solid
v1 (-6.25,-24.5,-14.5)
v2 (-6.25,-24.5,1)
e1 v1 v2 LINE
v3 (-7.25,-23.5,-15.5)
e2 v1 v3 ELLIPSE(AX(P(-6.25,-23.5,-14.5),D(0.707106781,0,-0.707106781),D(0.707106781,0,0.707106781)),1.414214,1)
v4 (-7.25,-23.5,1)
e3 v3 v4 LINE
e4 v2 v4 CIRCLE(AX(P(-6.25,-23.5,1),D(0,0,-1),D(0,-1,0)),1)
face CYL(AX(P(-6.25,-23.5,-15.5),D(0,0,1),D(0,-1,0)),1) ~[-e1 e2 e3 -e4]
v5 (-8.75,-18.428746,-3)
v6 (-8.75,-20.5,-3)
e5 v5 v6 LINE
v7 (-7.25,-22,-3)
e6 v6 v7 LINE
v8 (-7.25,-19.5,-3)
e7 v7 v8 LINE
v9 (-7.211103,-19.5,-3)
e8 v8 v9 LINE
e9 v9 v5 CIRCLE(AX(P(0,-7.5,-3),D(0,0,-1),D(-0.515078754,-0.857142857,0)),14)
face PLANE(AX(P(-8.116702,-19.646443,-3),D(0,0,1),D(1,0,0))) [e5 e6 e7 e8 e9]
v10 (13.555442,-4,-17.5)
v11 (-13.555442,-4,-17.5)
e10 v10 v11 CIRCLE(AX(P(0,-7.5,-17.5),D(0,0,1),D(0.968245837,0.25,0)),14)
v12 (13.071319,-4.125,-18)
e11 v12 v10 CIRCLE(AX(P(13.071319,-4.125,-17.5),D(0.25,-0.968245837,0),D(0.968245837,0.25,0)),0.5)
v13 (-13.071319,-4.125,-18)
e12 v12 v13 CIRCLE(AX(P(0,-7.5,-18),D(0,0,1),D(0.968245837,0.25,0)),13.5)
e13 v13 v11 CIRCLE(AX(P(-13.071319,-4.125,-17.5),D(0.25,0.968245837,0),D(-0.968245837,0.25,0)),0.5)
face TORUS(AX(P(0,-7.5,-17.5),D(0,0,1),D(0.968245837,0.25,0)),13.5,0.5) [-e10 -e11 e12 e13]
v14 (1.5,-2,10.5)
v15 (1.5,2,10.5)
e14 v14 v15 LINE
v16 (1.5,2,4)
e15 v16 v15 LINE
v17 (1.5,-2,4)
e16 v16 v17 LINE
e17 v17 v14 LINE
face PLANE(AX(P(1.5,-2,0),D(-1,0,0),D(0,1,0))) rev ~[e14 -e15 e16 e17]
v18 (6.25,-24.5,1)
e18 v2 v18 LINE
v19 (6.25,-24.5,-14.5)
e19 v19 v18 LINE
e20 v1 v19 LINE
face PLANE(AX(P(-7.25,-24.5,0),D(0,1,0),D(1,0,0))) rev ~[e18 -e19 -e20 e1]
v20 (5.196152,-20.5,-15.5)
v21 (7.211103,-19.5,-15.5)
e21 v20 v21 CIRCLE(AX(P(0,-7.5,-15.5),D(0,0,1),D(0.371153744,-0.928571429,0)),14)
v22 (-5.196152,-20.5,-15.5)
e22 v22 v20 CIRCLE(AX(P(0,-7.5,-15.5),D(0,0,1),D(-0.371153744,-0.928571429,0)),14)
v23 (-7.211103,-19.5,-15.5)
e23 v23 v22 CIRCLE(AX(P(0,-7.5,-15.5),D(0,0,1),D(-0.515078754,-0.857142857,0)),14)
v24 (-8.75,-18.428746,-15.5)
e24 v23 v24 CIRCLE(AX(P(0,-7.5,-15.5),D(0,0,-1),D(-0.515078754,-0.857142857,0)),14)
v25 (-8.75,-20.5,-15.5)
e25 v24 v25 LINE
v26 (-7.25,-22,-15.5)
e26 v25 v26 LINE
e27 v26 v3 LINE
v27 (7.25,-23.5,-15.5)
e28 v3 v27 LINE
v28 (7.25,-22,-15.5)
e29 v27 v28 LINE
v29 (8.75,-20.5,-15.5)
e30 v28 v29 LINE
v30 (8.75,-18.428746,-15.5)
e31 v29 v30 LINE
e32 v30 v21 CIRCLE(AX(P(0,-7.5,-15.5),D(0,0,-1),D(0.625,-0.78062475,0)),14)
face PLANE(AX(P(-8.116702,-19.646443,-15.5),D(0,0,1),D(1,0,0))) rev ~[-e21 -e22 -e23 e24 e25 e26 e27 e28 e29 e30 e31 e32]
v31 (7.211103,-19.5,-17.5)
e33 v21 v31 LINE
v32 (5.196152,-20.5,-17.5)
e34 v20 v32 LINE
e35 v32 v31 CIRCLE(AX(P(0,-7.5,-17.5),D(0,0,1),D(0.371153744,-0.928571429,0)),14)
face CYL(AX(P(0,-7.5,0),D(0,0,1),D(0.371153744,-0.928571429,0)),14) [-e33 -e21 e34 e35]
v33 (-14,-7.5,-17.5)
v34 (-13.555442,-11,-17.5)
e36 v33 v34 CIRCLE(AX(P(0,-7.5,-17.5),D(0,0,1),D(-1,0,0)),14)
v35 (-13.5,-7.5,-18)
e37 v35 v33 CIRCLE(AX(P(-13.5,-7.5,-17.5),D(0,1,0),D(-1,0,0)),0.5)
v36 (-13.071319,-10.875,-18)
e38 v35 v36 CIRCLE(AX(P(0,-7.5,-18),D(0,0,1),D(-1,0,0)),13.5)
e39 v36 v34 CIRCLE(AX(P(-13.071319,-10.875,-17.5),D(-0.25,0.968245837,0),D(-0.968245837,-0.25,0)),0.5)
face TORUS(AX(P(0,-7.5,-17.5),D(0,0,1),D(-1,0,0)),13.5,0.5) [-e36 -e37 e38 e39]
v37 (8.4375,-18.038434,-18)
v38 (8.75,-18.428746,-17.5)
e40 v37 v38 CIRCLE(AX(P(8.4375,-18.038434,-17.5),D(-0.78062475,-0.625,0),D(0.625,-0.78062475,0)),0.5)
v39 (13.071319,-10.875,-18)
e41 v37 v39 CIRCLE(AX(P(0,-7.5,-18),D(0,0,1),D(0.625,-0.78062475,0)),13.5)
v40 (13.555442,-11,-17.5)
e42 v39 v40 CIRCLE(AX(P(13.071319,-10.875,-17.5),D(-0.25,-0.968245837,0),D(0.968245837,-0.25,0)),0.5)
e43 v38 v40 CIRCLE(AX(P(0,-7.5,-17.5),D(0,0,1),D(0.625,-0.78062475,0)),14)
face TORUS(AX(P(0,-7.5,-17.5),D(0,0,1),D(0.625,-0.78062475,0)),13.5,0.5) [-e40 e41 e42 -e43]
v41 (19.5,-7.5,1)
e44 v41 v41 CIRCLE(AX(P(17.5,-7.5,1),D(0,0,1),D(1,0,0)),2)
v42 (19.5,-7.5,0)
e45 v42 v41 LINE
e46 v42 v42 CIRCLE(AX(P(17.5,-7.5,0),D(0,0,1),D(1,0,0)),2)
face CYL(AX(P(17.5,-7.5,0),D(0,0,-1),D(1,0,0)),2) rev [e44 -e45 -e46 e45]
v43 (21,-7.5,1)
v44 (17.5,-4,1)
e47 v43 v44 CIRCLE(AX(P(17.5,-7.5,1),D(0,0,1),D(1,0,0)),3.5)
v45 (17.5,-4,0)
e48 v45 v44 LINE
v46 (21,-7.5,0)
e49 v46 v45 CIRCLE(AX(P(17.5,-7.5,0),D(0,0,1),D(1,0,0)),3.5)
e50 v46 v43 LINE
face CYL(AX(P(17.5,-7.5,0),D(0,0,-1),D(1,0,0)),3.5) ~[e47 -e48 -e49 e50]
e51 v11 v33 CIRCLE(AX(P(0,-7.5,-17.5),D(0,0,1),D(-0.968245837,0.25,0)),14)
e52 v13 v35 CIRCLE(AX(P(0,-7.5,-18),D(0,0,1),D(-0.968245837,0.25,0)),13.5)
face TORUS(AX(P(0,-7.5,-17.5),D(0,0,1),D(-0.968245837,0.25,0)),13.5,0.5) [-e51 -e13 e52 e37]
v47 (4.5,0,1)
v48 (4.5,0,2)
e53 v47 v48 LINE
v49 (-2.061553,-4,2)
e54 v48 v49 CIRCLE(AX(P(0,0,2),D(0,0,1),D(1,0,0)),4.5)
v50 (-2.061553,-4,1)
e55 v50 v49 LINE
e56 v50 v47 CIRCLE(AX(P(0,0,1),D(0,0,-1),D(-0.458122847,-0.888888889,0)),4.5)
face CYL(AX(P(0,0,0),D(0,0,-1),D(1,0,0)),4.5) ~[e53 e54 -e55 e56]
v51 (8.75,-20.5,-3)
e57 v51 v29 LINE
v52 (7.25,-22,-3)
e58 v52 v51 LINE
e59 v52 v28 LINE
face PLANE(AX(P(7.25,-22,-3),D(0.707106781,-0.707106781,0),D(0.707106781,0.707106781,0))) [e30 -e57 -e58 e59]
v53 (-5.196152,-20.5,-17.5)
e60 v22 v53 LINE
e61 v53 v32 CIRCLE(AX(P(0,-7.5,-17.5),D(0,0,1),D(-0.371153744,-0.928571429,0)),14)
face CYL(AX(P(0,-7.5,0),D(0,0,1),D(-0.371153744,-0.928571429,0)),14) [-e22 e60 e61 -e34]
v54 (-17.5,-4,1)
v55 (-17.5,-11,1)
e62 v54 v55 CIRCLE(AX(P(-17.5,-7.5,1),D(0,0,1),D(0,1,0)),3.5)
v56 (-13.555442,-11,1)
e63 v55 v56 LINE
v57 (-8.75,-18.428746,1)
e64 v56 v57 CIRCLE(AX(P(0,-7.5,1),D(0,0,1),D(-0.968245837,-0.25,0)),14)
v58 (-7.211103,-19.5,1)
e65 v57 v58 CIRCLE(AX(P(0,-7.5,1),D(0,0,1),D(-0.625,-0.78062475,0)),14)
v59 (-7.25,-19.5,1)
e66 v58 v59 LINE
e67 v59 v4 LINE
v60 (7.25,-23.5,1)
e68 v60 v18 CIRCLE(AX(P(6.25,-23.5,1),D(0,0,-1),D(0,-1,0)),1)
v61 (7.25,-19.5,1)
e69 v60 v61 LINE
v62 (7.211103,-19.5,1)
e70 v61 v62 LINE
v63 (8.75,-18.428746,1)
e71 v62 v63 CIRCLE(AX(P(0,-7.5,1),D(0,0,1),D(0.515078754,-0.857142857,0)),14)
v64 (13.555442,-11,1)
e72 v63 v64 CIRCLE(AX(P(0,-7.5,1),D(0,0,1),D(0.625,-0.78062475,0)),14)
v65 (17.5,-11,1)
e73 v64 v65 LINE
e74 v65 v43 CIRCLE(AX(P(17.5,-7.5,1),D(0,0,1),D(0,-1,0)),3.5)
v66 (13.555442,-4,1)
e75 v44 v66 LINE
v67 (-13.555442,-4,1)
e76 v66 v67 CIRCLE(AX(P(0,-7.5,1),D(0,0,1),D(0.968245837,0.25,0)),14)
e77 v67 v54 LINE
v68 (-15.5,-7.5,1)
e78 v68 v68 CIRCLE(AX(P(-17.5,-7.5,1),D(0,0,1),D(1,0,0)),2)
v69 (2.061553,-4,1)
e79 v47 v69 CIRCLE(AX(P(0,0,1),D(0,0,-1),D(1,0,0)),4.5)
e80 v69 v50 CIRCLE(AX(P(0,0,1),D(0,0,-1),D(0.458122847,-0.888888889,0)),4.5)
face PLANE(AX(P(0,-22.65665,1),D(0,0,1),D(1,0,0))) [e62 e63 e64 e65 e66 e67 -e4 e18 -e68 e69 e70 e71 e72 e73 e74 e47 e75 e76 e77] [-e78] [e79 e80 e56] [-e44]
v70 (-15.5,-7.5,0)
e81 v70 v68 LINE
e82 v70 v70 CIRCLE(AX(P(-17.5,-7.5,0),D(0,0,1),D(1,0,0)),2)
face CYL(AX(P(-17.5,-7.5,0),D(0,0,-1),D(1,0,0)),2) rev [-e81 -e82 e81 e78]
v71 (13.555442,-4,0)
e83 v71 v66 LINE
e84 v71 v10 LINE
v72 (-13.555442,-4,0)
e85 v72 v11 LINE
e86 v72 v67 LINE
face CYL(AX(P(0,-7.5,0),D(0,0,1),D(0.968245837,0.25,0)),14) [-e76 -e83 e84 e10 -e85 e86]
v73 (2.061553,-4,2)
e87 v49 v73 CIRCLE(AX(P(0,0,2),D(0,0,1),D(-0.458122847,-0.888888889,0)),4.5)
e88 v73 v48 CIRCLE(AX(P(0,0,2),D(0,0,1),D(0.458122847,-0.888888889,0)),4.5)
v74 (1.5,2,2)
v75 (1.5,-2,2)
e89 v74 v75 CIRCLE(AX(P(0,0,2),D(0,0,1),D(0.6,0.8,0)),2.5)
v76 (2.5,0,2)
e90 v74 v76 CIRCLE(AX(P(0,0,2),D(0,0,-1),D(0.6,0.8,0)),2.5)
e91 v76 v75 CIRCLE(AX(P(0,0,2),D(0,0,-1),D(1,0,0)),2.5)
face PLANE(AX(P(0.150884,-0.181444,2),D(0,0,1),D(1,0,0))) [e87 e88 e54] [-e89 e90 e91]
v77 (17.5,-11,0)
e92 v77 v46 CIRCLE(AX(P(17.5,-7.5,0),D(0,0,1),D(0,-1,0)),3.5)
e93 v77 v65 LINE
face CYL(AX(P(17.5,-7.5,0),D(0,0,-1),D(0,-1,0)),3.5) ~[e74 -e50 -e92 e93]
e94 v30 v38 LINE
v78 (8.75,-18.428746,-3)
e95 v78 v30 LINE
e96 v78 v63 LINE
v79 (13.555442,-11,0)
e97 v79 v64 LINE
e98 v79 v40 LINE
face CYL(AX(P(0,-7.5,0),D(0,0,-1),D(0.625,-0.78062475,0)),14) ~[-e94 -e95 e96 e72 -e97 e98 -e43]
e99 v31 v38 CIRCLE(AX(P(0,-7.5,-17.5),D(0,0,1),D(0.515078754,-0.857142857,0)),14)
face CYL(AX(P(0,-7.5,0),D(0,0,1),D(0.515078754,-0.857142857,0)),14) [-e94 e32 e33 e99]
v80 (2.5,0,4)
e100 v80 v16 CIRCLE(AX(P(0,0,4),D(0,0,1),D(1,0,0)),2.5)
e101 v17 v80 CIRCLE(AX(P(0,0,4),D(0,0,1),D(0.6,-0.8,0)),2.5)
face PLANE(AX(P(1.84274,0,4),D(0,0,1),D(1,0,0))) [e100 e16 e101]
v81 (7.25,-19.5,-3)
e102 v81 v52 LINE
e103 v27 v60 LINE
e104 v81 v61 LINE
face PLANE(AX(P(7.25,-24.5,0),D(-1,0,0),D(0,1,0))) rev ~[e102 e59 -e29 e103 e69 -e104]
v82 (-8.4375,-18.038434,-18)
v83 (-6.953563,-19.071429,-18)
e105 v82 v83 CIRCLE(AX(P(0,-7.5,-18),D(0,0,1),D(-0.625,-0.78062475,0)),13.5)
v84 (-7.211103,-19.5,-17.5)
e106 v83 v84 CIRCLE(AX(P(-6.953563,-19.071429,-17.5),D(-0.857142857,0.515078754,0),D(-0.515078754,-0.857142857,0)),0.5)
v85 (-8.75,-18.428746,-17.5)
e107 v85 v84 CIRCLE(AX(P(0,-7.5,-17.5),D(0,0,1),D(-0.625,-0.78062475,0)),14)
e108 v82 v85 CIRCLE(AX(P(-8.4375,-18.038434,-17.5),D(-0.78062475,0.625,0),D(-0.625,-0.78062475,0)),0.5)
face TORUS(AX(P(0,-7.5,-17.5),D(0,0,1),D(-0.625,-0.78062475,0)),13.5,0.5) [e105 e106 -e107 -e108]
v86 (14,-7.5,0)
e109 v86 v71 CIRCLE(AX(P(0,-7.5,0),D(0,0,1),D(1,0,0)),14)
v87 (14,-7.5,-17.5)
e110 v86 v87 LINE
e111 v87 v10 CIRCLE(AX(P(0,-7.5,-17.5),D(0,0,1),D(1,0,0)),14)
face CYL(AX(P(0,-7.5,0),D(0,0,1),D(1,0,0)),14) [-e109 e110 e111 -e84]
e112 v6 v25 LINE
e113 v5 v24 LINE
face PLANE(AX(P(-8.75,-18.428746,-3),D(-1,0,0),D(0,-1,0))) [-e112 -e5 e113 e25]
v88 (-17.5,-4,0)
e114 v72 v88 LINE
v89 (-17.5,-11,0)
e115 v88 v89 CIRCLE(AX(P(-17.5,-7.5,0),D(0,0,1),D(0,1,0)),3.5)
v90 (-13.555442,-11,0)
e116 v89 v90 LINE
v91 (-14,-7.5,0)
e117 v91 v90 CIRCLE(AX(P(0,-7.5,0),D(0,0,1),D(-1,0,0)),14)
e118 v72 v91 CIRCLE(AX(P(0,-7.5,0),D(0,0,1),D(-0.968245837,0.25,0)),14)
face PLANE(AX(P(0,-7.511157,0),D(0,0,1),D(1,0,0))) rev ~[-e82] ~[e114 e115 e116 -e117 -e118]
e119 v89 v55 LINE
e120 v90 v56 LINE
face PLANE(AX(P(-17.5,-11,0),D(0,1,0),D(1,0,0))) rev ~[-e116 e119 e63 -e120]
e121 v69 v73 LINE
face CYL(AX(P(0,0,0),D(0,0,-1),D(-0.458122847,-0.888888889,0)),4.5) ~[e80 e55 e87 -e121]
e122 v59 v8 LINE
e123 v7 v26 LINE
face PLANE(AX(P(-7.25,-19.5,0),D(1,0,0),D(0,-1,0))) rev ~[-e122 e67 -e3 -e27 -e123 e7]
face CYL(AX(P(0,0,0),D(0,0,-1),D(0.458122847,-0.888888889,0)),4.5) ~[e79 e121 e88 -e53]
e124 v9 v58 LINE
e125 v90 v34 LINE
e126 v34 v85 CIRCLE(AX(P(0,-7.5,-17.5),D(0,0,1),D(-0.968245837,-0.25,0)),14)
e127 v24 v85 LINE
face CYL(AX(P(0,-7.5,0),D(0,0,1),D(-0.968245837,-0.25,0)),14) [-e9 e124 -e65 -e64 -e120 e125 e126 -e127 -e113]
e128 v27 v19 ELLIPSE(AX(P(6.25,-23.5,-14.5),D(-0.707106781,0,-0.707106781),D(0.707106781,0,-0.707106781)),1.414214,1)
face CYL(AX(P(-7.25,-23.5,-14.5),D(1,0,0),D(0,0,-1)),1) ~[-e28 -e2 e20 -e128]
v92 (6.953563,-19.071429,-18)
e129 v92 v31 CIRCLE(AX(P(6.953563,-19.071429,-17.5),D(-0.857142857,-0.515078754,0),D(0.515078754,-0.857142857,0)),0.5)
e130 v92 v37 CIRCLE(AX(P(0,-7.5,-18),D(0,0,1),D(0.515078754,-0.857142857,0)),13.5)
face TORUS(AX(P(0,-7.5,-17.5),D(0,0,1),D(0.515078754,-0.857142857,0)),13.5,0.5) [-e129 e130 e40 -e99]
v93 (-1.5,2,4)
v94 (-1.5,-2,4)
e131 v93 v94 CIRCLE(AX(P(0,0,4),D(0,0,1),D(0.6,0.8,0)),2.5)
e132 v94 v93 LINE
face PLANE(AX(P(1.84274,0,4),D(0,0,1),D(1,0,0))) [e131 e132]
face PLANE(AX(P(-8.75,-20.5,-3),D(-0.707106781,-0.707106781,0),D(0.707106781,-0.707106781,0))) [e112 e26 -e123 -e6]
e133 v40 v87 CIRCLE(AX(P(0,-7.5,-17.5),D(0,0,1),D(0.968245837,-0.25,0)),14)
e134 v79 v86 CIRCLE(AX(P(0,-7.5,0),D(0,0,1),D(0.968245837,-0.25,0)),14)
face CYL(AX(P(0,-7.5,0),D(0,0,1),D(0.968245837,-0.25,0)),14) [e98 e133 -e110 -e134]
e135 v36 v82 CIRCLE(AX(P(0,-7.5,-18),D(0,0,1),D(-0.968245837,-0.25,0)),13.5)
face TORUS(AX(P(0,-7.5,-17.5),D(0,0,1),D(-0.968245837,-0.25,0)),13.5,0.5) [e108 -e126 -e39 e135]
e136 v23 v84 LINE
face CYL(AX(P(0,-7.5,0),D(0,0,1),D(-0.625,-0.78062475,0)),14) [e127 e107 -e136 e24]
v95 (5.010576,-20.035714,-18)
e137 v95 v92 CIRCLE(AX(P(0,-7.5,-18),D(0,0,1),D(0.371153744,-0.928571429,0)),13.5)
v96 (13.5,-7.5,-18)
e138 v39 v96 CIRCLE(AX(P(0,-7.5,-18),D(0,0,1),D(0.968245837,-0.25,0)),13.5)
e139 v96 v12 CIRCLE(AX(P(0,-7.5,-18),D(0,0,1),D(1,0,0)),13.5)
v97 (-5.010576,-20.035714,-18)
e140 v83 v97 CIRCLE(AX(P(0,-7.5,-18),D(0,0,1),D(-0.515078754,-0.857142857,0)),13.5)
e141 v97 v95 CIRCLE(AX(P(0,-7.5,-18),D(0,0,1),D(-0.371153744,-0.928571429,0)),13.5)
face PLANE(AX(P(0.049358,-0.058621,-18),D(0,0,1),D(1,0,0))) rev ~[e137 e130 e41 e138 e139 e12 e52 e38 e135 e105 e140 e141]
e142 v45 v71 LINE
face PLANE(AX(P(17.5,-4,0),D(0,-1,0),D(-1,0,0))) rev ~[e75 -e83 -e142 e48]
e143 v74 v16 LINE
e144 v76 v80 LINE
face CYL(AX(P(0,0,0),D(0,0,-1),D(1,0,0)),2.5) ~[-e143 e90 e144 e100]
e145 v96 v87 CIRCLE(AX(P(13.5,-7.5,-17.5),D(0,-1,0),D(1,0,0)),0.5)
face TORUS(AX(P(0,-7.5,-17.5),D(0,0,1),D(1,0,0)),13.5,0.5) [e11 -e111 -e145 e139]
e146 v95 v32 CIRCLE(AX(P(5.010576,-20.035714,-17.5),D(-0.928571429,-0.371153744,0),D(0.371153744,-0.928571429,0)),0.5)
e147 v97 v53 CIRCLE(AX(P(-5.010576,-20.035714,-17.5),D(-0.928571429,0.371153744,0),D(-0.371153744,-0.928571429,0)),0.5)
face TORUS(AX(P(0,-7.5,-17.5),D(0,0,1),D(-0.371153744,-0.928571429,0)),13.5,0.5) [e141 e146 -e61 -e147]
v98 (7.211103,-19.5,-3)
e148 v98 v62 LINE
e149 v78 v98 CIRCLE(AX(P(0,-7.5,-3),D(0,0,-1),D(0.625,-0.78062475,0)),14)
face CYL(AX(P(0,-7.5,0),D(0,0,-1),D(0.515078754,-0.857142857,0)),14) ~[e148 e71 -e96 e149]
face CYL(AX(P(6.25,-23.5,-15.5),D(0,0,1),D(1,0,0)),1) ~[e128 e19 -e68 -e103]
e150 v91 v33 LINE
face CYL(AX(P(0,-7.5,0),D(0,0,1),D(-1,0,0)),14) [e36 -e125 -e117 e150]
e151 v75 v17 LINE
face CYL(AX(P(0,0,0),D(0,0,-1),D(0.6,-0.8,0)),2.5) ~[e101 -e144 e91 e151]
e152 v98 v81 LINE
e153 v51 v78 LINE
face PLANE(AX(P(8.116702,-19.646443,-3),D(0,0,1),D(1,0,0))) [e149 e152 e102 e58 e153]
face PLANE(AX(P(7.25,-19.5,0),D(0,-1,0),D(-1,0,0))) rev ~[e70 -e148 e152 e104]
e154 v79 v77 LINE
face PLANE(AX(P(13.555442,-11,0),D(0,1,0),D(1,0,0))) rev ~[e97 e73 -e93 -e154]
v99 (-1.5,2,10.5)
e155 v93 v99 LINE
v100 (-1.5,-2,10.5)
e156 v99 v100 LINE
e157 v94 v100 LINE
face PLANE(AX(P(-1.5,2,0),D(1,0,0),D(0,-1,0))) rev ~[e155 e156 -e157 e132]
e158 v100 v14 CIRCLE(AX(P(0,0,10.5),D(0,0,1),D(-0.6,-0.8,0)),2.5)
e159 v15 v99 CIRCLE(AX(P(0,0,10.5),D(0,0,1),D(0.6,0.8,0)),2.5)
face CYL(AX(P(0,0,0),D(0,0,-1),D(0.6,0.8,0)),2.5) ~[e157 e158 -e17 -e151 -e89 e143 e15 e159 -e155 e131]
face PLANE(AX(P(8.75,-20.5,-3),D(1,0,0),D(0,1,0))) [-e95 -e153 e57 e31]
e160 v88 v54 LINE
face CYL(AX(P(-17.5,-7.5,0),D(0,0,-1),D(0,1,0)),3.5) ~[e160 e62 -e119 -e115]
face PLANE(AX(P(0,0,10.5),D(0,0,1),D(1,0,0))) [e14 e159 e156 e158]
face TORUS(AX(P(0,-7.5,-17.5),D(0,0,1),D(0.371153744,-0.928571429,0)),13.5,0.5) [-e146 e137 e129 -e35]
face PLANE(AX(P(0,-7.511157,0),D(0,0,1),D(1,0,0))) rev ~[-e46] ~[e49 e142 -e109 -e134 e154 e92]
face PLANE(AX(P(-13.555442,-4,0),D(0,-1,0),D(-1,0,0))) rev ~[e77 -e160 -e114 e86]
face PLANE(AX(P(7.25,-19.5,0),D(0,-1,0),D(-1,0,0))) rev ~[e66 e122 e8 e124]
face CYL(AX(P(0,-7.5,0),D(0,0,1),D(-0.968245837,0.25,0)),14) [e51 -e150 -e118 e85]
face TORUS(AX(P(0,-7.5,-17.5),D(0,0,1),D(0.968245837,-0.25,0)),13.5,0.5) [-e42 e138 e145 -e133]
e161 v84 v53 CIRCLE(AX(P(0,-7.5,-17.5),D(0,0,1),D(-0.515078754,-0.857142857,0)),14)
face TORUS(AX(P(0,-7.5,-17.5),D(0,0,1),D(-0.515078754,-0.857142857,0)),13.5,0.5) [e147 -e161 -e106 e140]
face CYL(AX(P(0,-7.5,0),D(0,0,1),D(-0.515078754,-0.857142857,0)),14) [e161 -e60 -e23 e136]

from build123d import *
from build123d import SkipClean  # not in build123d's __all__

# Parameters (mm, degrees)
F0_R          = 2
F1_DEPTH      = 1
F2_DEPTH      = 18
F3_DEPTH      = 15.5
F3_DEPTH_BACK = 1
F4_START      = -3
F4_DEPTH      = 12.5
F5_DEPTH      = 2
F6_DEPTH      = 4
F7_DEPTH      = 10.5
F8_R          = 0.5
F9_R          = 1


with BuildPart() as f1:
    # F0 (on Top) → F1 (new body)
    with BuildSketch(Plane.XY):
        with BuildLine():
            ThreePointArc((2.0615528128, -4), (0, -4.5), (-2.0615528128, -4))
            Line((-2.0615528128, -4), (-13.5554417117, -4))
            ThreePointArc((-13.5554417117, -4), (-13.8884157477, -5.7359399052), (-14, -7.5))
            ThreePointArc((-14, -7.5), (-13.8884157477, -9.2640600948), (-13.5554417117, -11))
            Line((-13.5554417117, -11), (13.5554417117, -11))
            ThreePointArc((13.5554417117, -11), (13.8884157477, -9.2640600948), (14, -7.5))
            ThreePointArc((14, -7.5), (13.8884157477, -5.7359399052), (13.5554417117, -4))
            Line((13.5554417117, -4), (2.0615528128, -4))
        make_face()
        with BuildLine():
            ThreePointArc((17.5, -4), (15.0251262658, -5.0251262658), (14, -7.5))
            ThreePointArc((14, -7.5), (15.0251262658, -9.9748737342), (17.5, -11))
            ThreePointArc((17.5, -11), (19.9748737342, -9.9748737342), (21, -7.5))
            ThreePointArc((21, -7.5), (19.9748737342, -5.0251262658), (17.5, -4))
        make_face()
        with Locations((17.5, -7.5)):
            Circle(F0_R, mode=Mode.SUBTRACT)
        with BuildLine():
            ThreePointArc((-17.5, -11), (-15.0251262658, -9.9748737342), (-14, -7.5))
            ThreePointArc((-14, -7.5), (-15.0251262658, -5.0251262658), (-17.5, -4))
            ThreePointArc((-17.5, -4), (-21, -7.5), (-17.5, -11))
        make_face()
        with Locations((-17.5, -7.5)):
            Circle(F0_R, mode=Mode.SUBTRACT)
        with BuildLine():
            ThreePointArc((-14, -7.5), (-13.8884157477, -5.7359399052), (-13.5554417117, -4))
            Line((-13.5554417117, -4), (-17.5, -4))
            ThreePointArc((-17.5, -4), (-15.0251262658, -5.0251262658), (-14, -7.5))
        make_face()
        with BuildLine():
            ThreePointArc((-13.5554417117, -11), (-13.8884157477, -9.2640600948), (-14, -7.5))
            ThreePointArc((-14, -7.5), (-15.0251262658, -9.9748737342), (-17.5, -11))
            Line((-17.5, -11), (-13.5554417117, -11))
        make_face()
        with BuildLine():
            Line((13.5554417117, -11), (-13.5554417117, -11))
            ThreePointArc((-13.5554417117, -11), (-11.7549883504, -15.1039627091), (-8.75, -18.4287464972))
            Line((-8.75, -18.4287464972), (-8.75, -12.5))
            Line((-8.75, -12.5), (8.75, -12.5))
            Line((8.75, -12.5), (8.75, -18.4287464972))
            ThreePointArc((8.75, -18.4287464972), (11.7549883504, -15.1039627091), (13.5554417117, -11))
        make_face()
        with BuildLine():
            Line((-8.75, -12.5), (-8.75, -18.4287464972))
            ThreePointArc((-8.75, -18.4287464972), (-7.9985057778, -18.9901655916), (-7.2111025509, -19.5))
            Line((-7.2111025509, -19.5), (7.2111025509, -19.5))
            ThreePointArc((7.2111025509, -19.5), (7.9985057778, -18.9901655916), (8.75, -18.4287464972))
            Line((8.75, -18.4287464972), (8.75, -12.5))
            Line((8.75, -12.5), (-8.75, -12.5))
        make_face()
        with BuildLine():
            ThreePointArc((-2.0615528128, -4), (-2.3423292192, 3.8423292192), (4.5, 0))
            ThreePointArc((4.5, 0), (3.8423292192, -2.3423292192), (2.0615528128, -4))
            Line((2.0615528128, -4), (13.5554417117, -4))
            ThreePointArc((13.5554417117, -4), (0, 6.5), (-13.5554417117, -4))
            Line((-13.5554417117, -4), (-2.0615528128, -4))
        make_face()
        with BuildLine():
            Line((17.5, -4), (13.5554417117, -4))
            ThreePointArc((13.5554417117, -4), (13.8884157477, -5.7359399052), (14, -7.5))
            ThreePointArc((14, -7.5), (15.0251262658, -5.0251262658), (17.5, -4))
        make_face()
        with BuildLine():
            ThreePointArc((17.5, -11), (15.0251262658, -9.9748737342), (14, -7.5))
            ThreePointArc((14, -7.5), (13.8884157477, -9.2640600948), (13.5554417117, -11))
            Line((13.5554417117, -11), (17.5, -11))
        make_face()
    extrude(amount=F1_DEPTH)

    # F0 (on Top) → F2 (join)
    with BuildSketch(Plane.XY):
        with BuildLine():
            ThreePointArc((-2.0615528128, -4), (-2.3423292192, 3.8423292192), (4.5, 0))
            ThreePointArc((4.5, 0), (3.8423292192, -2.3423292192), (2.0615528128, -4))
            Line((2.0615528128, -4), (13.5554417117, -4))
            ThreePointArc((13.5554417117, -4), (0, 6.5), (-13.5554417117, -4))
            Line((-13.5554417117, -4), (-2.0615528128, -4))
        make_face()
        with BuildLine():
            ThreePointArc((2.0615528128, -4), (0, -4.5), (-2.0615528128, -4))
            Line((-2.0615528128, -4), (-13.5554417117, -4))
            ThreePointArc((-13.5554417117, -4), (-13.8884157477, -5.7359399052), (-14, -7.5))
            ThreePointArc((-14, -7.5), (-13.8884157477, -9.2640600948), (-13.5554417117, -11))
            Line((-13.5554417117, -11), (13.5554417117, -11))
            ThreePointArc((13.5554417117, -11), (13.8884157477, -9.2640600948), (14, -7.5))
            ThreePointArc((14, -7.5), (13.8884157477, -5.7359399052), (13.5554417117, -4))
            Line((13.5554417117, -4), (2.0615528128, -4))
        make_face()
        with BuildLine():
            Line((13.5554417117, -11), (-13.5554417117, -11))
            ThreePointArc((-13.5554417117, -11), (-11.7549883504, -15.1039627091), (-8.75, -18.4287464972))
            Line((-8.75, -18.4287464972), (-8.75, -12.5))
            Line((-8.75, -12.5), (8.75, -12.5))
            Line((8.75, -12.5), (8.75, -18.4287464972))
            ThreePointArc((8.75, -18.4287464972), (11.7549883504, -15.1039627091), (13.5554417117, -11))
        make_face()
        with BuildLine():
            Line((-8.75, -12.5), (-8.75, -18.4287464972))
            ThreePointArc((-8.75, -18.4287464972), (-7.9985057778, -18.9901655916), (-7.2111025509, -19.5))
            Line((-7.2111025509, -19.5), (7.2111025509, -19.5))
            ThreePointArc((7.2111025509, -19.5), (7.9985057778, -18.9901655916), (8.75, -18.4287464972))
            Line((8.75, -18.4287464972), (8.75, -12.5))
            Line((8.75, -12.5), (-8.75, -12.5))
        make_face()
        with BuildLine():
            Line((5.1961524227, -20.5), (-5.1961524227, -20.5))
            ThreePointArc((-5.1961524227, -20.5), (0, -21.5), (5.1961524227, -20.5))
        make_face()
        with BuildLine():
            Line((7.2111025509, -19.5), (-7.2111025509, -19.5))
            ThreePointArc((-7.2111025509, -19.5), (-6.223744371, -20.0405345183), (-5.1961524227, -20.5))
            Line((-5.1961524227, -20.5), (5.1961524227, -20.5))
            ThreePointArc((5.1961524227, -20.5), (6.223744371, -20.0405345183), (7.2111025509, -19.5))
        make_face()
        with BuildLine():
            ThreePointArc((2.0615528128, -4), (3.8423292192, -2.3423292192), (4.5, 0))
            ThreePointArc((4.5, 0), (-2.3423292192, 3.8423292192), (-2.0615528128, -4))
            Line((-2.0615528128, -4), (2.0615528128, -4))
        make_face()
        with BuildLine():
            ThreePointArc((1.5, 2), (2.2360679775, 1.1180339887), (2.5, 0))
            ThreePointArc((2.5, 0), (2.2360679775, -1.1180339887), (1.5, -2))
            Line((1.5, -2), (1.5, -3.1181974337))
            Line((1.5, -3.1181974337), (-1.5, -3.1181974337))
            Line((-1.5, -3.1181974337), (-1.5, -2))
            ThreePointArc((-1.5, -2), (-2.5, 0), (-1.5, 2))
            Line((-1.5, 2), (-1.5, 2.8818025663))
            Line((-1.5, 2.8818025663), (1.5, 2.8818025663))
            Line((1.5, 2.8818025663), (1.5, 2))
        make_face(mode=Mode.SUBTRACT)
        with BuildLine():
            Line((2.0615528128, -4), (-2.0615528128, -4))
            ThreePointArc((-2.0615528128, -4), (0, -4.5), (2.0615528128, -4))
        make_face()
        with BuildLine():
            ThreePointArc((-1.5, 2), (0, 2.5), (1.5, 2))
            Line((1.5, 2), (1.5, 2.8818025663))
            Line((1.5, 2.8818025663), (-1.5, 2.8818025663))
            Line((-1.5, 2.8818025663), (-1.5, 2))
        make_face()
        with BuildLine():
            Line((1.5, -2), (1.5, 2))
            ThreePointArc((1.5, 2), (0, 2.5), (-1.5, 2))
            Line((-1.5, 2), (-1.5, -2))
            ThreePointArc((-1.5, -2), (0, -2.5), (1.5, -2))
        make_face()
        with BuildLine():
            ThreePointArc((1.5, -2), (2.2360679775, -1.1180339887), (2.5, 0))
            ThreePointArc((2.5, 0), (2.2360679775, 1.1180339887), (1.5, 2))
            Line((1.5, 2), (1.5, -2))
        make_face()
        with BuildLine():
            Line((1.5, -3.1181974337), (1.5, -2))
            ThreePointArc((1.5, -2), (0, -2.5), (-1.5, -2))
            Line((-1.5, -2), (-1.5, -3.1181974337))
            Line((-1.5, -3.1181974337), (1.5, -3.1181974337))
        make_face()
        with BuildLine():
            Line((-1.5, -2), (-1.5, 2))
            ThreePointArc((-1.5, 2), (-2.5, 0), (-1.5, -2))
        make_face()
    with SkipClean():  # cleaning this boolean's faces spoils the solid; the shape is the same uncleaned
        extrude(amount=-F2_DEPTH)

    # F0 (on Top) → F3 (join, two sides)
    with BuildSketch(Plane.XY) as f3_sk:
        with BuildLine():
            ThreePointArc((5.1961524227, -20.5), (0, -21.5), (-5.1961524227, -20.5))
            Line((-5.1961524227, -20.5), (-7.25, -20.5))
            Line((-7.25, -20.5), (-7.25, -22))
            Line((-7.25, -22), (-7.25, -24.5))
            Line((-7.25, -24.5), (7.25, -24.5))
            Line((7.25, -24.5), (7.25, -22))
            Line((7.25, -22), (7.25, -20.5))
            Line((7.25, -20.5), (5.1961524227, -20.5))
        make_face()
        with BuildLine():
            ThreePointArc((-5.1961524227, -20.5), (-6.223744371, -20.0405345183), (-7.2111025509, -19.5))
            Line((-7.2111025509, -19.5), (-7.25, -19.5))
            Line((-7.25, -19.5), (-7.25, -20.5))
            Line((-7.25, -20.5), (-5.1961524227, -20.5))
        make_face()
        with BuildLine():
            Line((5.1961524227, -20.5), (-5.1961524227, -20.5))
            ThreePointArc((-5.1961524227, -20.5), (0, -21.5), (5.1961524227, -20.5))
        make_face()
        with BuildLine():
            Line((7.2111025509, -19.5), (-7.2111025509, -19.5))
            ThreePointArc((-7.2111025509, -19.5), (-6.223744371, -20.0405345183), (-5.1961524227, -20.5))
            Line((-5.1961524227, -20.5), (5.1961524227, -20.5))
            ThreePointArc((5.1961524227, -20.5), (6.223744371, -20.0405345183), (7.2111025509, -19.5))
        make_face()
        with BuildLine():
            Line((7.25, -19.5), (7.2111025509, -19.5))
            ThreePointArc((7.2111025509, -19.5), (6.223744371, -20.0405345183), (5.1961524227, -20.5))
            Line((5.1961524227, -20.5), (7.25, -20.5))
            Line((7.25, -20.5), (7.25, -19.5))
        make_face()
    extrude(amount=-F3_DEPTH)
    extrude(f3_sk.sketch, amount=F3_DEPTH_BACK)

    # F0 (on Top) → F4 (join)
    with BuildSketch(Plane.XY.offset(F4_START)):
        with BuildLine():
            Line((8.75, -20.5), (8.75, -18.4287464972))
            ThreePointArc((8.75, -18.4287464972), (7.9985057778, -18.9901655916), (7.2111025509, -19.5))
            Line((7.2111025509, -19.5), (7.25, -19.5))
            Line((7.25, -19.5), (7.25, -20.5))
            Line((7.25, -20.5), (8.75, -20.5))
        make_face()
        Polygon((7.25, -22), (8.75, -20.5), (7.25, -20.5), align=None)
        with BuildLine():
            ThreePointArc((-7.2111025509, -19.5), (-7.9985057778, -18.9901655916), (-8.75, -18.4287464972))
            Line((-8.75, -18.4287464972), (-8.75, -20.5))
            Line((-8.75, -20.5), (-7.25, -20.5))
            Line((-7.25, -20.5), (-7.25, -19.5))
            Line((-7.25, -19.5), (-7.2111025509, -19.5))
        make_face()
        Polygon((-7.25, -20.5), (-8.75, -20.5), (-7.25, -22), align=None)
    extrude(amount=-F4_DEPTH)

    # F0 (on Top) → F5 (join)
    with BuildSketch(Plane.XY):
        with BuildLine():
            ThreePointArc((2.0615528128, -4), (3.8423292192, -2.3423292192), (4.5, 0))
            ThreePointArc((4.5, 0), (-2.3423292192, 3.8423292192), (-2.0615528128, -4))
            Line((-2.0615528128, -4), (2.0615528128, -4))
        make_face()
        with BuildLine():
            ThreePointArc((1.5, 2), (2.2360679775, 1.1180339887), (2.5, 0))
            ThreePointArc((2.5, 0), (2.2360679775, -1.1180339887), (1.5, -2))
            Line((1.5, -2), (1.5, -3.1181974337))
            Line((1.5, -3.1181974337), (-1.5, -3.1181974337))
            Line((-1.5, -3.1181974337), (-1.5, -2))
            ThreePointArc((-1.5, -2), (-2.5, 0), (-1.5, 2))
            Line((-1.5, 2), (-1.5, 2.8818025663))
            Line((-1.5, 2.8818025663), (1.5, 2.8818025663))
            Line((1.5, 2.8818025663), (1.5, 2))
        make_face(mode=Mode.SUBTRACT)
        with BuildLine():
            ThreePointArc((-1.5, 2), (0, 2.5), (1.5, 2))
            Line((1.5, 2), (1.5, 2.8818025663))
            Line((1.5, 2.8818025663), (-1.5, 2.8818025663))
            Line((-1.5, 2.8818025663), (-1.5, 2))
        make_face()
        with BuildLine():
            Line((1.5, -3.1181974337), (1.5, -2))
            ThreePointArc((1.5, -2), (0, -2.5), (-1.5, -2))
            Line((-1.5, -2), (-1.5, -3.1181974337))
            Line((-1.5, -3.1181974337), (1.5, -3.1181974337))
        make_face()
        with BuildLine():
            Line((2.0615528128, -4), (-2.0615528128, -4))
            ThreePointArc((-2.0615528128, -4), (0, -4.5), (2.0615528128, -4))
        make_face()
    extrude(amount=F5_DEPTH)

    # F0 (on Top) → F6 (join)
    with BuildSketch(Plane.XY):
        with BuildLine():
            ThreePointArc((1.5, -2), (2.2360679775, -1.1180339887), (2.5, 0))
            ThreePointArc((2.5, 0), (2.2360679775, 1.1180339887), (1.5, 2))
            Line((1.5, 2), (1.5, -2))
        make_face()
        with BuildLine():
            Line((1.5, -2), (1.5, 2))
            ThreePointArc((1.5, 2), (0, 2.5), (-1.5, 2))
            Line((-1.5, 2), (-1.5, -2))
            ThreePointArc((-1.5, -2), (0, -2.5), (1.5, -2))
        make_face()
        with BuildLine():
            Line((-1.5, -2), (-1.5, 2))
            ThreePointArc((-1.5, 2), (-2.5, 0), (-1.5, -2))
        make_face()
    extrude(amount=F6_DEPTH)

    # F0 (on Top) → F7 (join)
    with BuildSketch(Plane.XY):
        with BuildLine():
            Line((1.5, -2), (1.5, 2))
            ThreePointArc((1.5, 2), (0, 2.5), (-1.5, 2))
            Line((-1.5, 2), (-1.5, -2))
            ThreePointArc((-1.5, -2), (0, -2.5), (1.5, -2))
        make_face()
    extrude(amount=F7_DEPTH)

    # F8
    f8_edges = [f1.edges().sort_by_distance(p)[0] for p in [
        (7.211103, 4.5, -18),
    ]]
    fillet(f8_edges, radius=F8_R)

    # F9
    f9_edges = [f1.edges().sort_by_distance(p)[0] for p in [
        (-7.25, -24.5, -7.25),
        (0, -24.5, -15.5),
        (7.25, -24.5, -7.25),
    ]]
    fillet(f9_edges, radius=F9_R)


solid = f1.part
